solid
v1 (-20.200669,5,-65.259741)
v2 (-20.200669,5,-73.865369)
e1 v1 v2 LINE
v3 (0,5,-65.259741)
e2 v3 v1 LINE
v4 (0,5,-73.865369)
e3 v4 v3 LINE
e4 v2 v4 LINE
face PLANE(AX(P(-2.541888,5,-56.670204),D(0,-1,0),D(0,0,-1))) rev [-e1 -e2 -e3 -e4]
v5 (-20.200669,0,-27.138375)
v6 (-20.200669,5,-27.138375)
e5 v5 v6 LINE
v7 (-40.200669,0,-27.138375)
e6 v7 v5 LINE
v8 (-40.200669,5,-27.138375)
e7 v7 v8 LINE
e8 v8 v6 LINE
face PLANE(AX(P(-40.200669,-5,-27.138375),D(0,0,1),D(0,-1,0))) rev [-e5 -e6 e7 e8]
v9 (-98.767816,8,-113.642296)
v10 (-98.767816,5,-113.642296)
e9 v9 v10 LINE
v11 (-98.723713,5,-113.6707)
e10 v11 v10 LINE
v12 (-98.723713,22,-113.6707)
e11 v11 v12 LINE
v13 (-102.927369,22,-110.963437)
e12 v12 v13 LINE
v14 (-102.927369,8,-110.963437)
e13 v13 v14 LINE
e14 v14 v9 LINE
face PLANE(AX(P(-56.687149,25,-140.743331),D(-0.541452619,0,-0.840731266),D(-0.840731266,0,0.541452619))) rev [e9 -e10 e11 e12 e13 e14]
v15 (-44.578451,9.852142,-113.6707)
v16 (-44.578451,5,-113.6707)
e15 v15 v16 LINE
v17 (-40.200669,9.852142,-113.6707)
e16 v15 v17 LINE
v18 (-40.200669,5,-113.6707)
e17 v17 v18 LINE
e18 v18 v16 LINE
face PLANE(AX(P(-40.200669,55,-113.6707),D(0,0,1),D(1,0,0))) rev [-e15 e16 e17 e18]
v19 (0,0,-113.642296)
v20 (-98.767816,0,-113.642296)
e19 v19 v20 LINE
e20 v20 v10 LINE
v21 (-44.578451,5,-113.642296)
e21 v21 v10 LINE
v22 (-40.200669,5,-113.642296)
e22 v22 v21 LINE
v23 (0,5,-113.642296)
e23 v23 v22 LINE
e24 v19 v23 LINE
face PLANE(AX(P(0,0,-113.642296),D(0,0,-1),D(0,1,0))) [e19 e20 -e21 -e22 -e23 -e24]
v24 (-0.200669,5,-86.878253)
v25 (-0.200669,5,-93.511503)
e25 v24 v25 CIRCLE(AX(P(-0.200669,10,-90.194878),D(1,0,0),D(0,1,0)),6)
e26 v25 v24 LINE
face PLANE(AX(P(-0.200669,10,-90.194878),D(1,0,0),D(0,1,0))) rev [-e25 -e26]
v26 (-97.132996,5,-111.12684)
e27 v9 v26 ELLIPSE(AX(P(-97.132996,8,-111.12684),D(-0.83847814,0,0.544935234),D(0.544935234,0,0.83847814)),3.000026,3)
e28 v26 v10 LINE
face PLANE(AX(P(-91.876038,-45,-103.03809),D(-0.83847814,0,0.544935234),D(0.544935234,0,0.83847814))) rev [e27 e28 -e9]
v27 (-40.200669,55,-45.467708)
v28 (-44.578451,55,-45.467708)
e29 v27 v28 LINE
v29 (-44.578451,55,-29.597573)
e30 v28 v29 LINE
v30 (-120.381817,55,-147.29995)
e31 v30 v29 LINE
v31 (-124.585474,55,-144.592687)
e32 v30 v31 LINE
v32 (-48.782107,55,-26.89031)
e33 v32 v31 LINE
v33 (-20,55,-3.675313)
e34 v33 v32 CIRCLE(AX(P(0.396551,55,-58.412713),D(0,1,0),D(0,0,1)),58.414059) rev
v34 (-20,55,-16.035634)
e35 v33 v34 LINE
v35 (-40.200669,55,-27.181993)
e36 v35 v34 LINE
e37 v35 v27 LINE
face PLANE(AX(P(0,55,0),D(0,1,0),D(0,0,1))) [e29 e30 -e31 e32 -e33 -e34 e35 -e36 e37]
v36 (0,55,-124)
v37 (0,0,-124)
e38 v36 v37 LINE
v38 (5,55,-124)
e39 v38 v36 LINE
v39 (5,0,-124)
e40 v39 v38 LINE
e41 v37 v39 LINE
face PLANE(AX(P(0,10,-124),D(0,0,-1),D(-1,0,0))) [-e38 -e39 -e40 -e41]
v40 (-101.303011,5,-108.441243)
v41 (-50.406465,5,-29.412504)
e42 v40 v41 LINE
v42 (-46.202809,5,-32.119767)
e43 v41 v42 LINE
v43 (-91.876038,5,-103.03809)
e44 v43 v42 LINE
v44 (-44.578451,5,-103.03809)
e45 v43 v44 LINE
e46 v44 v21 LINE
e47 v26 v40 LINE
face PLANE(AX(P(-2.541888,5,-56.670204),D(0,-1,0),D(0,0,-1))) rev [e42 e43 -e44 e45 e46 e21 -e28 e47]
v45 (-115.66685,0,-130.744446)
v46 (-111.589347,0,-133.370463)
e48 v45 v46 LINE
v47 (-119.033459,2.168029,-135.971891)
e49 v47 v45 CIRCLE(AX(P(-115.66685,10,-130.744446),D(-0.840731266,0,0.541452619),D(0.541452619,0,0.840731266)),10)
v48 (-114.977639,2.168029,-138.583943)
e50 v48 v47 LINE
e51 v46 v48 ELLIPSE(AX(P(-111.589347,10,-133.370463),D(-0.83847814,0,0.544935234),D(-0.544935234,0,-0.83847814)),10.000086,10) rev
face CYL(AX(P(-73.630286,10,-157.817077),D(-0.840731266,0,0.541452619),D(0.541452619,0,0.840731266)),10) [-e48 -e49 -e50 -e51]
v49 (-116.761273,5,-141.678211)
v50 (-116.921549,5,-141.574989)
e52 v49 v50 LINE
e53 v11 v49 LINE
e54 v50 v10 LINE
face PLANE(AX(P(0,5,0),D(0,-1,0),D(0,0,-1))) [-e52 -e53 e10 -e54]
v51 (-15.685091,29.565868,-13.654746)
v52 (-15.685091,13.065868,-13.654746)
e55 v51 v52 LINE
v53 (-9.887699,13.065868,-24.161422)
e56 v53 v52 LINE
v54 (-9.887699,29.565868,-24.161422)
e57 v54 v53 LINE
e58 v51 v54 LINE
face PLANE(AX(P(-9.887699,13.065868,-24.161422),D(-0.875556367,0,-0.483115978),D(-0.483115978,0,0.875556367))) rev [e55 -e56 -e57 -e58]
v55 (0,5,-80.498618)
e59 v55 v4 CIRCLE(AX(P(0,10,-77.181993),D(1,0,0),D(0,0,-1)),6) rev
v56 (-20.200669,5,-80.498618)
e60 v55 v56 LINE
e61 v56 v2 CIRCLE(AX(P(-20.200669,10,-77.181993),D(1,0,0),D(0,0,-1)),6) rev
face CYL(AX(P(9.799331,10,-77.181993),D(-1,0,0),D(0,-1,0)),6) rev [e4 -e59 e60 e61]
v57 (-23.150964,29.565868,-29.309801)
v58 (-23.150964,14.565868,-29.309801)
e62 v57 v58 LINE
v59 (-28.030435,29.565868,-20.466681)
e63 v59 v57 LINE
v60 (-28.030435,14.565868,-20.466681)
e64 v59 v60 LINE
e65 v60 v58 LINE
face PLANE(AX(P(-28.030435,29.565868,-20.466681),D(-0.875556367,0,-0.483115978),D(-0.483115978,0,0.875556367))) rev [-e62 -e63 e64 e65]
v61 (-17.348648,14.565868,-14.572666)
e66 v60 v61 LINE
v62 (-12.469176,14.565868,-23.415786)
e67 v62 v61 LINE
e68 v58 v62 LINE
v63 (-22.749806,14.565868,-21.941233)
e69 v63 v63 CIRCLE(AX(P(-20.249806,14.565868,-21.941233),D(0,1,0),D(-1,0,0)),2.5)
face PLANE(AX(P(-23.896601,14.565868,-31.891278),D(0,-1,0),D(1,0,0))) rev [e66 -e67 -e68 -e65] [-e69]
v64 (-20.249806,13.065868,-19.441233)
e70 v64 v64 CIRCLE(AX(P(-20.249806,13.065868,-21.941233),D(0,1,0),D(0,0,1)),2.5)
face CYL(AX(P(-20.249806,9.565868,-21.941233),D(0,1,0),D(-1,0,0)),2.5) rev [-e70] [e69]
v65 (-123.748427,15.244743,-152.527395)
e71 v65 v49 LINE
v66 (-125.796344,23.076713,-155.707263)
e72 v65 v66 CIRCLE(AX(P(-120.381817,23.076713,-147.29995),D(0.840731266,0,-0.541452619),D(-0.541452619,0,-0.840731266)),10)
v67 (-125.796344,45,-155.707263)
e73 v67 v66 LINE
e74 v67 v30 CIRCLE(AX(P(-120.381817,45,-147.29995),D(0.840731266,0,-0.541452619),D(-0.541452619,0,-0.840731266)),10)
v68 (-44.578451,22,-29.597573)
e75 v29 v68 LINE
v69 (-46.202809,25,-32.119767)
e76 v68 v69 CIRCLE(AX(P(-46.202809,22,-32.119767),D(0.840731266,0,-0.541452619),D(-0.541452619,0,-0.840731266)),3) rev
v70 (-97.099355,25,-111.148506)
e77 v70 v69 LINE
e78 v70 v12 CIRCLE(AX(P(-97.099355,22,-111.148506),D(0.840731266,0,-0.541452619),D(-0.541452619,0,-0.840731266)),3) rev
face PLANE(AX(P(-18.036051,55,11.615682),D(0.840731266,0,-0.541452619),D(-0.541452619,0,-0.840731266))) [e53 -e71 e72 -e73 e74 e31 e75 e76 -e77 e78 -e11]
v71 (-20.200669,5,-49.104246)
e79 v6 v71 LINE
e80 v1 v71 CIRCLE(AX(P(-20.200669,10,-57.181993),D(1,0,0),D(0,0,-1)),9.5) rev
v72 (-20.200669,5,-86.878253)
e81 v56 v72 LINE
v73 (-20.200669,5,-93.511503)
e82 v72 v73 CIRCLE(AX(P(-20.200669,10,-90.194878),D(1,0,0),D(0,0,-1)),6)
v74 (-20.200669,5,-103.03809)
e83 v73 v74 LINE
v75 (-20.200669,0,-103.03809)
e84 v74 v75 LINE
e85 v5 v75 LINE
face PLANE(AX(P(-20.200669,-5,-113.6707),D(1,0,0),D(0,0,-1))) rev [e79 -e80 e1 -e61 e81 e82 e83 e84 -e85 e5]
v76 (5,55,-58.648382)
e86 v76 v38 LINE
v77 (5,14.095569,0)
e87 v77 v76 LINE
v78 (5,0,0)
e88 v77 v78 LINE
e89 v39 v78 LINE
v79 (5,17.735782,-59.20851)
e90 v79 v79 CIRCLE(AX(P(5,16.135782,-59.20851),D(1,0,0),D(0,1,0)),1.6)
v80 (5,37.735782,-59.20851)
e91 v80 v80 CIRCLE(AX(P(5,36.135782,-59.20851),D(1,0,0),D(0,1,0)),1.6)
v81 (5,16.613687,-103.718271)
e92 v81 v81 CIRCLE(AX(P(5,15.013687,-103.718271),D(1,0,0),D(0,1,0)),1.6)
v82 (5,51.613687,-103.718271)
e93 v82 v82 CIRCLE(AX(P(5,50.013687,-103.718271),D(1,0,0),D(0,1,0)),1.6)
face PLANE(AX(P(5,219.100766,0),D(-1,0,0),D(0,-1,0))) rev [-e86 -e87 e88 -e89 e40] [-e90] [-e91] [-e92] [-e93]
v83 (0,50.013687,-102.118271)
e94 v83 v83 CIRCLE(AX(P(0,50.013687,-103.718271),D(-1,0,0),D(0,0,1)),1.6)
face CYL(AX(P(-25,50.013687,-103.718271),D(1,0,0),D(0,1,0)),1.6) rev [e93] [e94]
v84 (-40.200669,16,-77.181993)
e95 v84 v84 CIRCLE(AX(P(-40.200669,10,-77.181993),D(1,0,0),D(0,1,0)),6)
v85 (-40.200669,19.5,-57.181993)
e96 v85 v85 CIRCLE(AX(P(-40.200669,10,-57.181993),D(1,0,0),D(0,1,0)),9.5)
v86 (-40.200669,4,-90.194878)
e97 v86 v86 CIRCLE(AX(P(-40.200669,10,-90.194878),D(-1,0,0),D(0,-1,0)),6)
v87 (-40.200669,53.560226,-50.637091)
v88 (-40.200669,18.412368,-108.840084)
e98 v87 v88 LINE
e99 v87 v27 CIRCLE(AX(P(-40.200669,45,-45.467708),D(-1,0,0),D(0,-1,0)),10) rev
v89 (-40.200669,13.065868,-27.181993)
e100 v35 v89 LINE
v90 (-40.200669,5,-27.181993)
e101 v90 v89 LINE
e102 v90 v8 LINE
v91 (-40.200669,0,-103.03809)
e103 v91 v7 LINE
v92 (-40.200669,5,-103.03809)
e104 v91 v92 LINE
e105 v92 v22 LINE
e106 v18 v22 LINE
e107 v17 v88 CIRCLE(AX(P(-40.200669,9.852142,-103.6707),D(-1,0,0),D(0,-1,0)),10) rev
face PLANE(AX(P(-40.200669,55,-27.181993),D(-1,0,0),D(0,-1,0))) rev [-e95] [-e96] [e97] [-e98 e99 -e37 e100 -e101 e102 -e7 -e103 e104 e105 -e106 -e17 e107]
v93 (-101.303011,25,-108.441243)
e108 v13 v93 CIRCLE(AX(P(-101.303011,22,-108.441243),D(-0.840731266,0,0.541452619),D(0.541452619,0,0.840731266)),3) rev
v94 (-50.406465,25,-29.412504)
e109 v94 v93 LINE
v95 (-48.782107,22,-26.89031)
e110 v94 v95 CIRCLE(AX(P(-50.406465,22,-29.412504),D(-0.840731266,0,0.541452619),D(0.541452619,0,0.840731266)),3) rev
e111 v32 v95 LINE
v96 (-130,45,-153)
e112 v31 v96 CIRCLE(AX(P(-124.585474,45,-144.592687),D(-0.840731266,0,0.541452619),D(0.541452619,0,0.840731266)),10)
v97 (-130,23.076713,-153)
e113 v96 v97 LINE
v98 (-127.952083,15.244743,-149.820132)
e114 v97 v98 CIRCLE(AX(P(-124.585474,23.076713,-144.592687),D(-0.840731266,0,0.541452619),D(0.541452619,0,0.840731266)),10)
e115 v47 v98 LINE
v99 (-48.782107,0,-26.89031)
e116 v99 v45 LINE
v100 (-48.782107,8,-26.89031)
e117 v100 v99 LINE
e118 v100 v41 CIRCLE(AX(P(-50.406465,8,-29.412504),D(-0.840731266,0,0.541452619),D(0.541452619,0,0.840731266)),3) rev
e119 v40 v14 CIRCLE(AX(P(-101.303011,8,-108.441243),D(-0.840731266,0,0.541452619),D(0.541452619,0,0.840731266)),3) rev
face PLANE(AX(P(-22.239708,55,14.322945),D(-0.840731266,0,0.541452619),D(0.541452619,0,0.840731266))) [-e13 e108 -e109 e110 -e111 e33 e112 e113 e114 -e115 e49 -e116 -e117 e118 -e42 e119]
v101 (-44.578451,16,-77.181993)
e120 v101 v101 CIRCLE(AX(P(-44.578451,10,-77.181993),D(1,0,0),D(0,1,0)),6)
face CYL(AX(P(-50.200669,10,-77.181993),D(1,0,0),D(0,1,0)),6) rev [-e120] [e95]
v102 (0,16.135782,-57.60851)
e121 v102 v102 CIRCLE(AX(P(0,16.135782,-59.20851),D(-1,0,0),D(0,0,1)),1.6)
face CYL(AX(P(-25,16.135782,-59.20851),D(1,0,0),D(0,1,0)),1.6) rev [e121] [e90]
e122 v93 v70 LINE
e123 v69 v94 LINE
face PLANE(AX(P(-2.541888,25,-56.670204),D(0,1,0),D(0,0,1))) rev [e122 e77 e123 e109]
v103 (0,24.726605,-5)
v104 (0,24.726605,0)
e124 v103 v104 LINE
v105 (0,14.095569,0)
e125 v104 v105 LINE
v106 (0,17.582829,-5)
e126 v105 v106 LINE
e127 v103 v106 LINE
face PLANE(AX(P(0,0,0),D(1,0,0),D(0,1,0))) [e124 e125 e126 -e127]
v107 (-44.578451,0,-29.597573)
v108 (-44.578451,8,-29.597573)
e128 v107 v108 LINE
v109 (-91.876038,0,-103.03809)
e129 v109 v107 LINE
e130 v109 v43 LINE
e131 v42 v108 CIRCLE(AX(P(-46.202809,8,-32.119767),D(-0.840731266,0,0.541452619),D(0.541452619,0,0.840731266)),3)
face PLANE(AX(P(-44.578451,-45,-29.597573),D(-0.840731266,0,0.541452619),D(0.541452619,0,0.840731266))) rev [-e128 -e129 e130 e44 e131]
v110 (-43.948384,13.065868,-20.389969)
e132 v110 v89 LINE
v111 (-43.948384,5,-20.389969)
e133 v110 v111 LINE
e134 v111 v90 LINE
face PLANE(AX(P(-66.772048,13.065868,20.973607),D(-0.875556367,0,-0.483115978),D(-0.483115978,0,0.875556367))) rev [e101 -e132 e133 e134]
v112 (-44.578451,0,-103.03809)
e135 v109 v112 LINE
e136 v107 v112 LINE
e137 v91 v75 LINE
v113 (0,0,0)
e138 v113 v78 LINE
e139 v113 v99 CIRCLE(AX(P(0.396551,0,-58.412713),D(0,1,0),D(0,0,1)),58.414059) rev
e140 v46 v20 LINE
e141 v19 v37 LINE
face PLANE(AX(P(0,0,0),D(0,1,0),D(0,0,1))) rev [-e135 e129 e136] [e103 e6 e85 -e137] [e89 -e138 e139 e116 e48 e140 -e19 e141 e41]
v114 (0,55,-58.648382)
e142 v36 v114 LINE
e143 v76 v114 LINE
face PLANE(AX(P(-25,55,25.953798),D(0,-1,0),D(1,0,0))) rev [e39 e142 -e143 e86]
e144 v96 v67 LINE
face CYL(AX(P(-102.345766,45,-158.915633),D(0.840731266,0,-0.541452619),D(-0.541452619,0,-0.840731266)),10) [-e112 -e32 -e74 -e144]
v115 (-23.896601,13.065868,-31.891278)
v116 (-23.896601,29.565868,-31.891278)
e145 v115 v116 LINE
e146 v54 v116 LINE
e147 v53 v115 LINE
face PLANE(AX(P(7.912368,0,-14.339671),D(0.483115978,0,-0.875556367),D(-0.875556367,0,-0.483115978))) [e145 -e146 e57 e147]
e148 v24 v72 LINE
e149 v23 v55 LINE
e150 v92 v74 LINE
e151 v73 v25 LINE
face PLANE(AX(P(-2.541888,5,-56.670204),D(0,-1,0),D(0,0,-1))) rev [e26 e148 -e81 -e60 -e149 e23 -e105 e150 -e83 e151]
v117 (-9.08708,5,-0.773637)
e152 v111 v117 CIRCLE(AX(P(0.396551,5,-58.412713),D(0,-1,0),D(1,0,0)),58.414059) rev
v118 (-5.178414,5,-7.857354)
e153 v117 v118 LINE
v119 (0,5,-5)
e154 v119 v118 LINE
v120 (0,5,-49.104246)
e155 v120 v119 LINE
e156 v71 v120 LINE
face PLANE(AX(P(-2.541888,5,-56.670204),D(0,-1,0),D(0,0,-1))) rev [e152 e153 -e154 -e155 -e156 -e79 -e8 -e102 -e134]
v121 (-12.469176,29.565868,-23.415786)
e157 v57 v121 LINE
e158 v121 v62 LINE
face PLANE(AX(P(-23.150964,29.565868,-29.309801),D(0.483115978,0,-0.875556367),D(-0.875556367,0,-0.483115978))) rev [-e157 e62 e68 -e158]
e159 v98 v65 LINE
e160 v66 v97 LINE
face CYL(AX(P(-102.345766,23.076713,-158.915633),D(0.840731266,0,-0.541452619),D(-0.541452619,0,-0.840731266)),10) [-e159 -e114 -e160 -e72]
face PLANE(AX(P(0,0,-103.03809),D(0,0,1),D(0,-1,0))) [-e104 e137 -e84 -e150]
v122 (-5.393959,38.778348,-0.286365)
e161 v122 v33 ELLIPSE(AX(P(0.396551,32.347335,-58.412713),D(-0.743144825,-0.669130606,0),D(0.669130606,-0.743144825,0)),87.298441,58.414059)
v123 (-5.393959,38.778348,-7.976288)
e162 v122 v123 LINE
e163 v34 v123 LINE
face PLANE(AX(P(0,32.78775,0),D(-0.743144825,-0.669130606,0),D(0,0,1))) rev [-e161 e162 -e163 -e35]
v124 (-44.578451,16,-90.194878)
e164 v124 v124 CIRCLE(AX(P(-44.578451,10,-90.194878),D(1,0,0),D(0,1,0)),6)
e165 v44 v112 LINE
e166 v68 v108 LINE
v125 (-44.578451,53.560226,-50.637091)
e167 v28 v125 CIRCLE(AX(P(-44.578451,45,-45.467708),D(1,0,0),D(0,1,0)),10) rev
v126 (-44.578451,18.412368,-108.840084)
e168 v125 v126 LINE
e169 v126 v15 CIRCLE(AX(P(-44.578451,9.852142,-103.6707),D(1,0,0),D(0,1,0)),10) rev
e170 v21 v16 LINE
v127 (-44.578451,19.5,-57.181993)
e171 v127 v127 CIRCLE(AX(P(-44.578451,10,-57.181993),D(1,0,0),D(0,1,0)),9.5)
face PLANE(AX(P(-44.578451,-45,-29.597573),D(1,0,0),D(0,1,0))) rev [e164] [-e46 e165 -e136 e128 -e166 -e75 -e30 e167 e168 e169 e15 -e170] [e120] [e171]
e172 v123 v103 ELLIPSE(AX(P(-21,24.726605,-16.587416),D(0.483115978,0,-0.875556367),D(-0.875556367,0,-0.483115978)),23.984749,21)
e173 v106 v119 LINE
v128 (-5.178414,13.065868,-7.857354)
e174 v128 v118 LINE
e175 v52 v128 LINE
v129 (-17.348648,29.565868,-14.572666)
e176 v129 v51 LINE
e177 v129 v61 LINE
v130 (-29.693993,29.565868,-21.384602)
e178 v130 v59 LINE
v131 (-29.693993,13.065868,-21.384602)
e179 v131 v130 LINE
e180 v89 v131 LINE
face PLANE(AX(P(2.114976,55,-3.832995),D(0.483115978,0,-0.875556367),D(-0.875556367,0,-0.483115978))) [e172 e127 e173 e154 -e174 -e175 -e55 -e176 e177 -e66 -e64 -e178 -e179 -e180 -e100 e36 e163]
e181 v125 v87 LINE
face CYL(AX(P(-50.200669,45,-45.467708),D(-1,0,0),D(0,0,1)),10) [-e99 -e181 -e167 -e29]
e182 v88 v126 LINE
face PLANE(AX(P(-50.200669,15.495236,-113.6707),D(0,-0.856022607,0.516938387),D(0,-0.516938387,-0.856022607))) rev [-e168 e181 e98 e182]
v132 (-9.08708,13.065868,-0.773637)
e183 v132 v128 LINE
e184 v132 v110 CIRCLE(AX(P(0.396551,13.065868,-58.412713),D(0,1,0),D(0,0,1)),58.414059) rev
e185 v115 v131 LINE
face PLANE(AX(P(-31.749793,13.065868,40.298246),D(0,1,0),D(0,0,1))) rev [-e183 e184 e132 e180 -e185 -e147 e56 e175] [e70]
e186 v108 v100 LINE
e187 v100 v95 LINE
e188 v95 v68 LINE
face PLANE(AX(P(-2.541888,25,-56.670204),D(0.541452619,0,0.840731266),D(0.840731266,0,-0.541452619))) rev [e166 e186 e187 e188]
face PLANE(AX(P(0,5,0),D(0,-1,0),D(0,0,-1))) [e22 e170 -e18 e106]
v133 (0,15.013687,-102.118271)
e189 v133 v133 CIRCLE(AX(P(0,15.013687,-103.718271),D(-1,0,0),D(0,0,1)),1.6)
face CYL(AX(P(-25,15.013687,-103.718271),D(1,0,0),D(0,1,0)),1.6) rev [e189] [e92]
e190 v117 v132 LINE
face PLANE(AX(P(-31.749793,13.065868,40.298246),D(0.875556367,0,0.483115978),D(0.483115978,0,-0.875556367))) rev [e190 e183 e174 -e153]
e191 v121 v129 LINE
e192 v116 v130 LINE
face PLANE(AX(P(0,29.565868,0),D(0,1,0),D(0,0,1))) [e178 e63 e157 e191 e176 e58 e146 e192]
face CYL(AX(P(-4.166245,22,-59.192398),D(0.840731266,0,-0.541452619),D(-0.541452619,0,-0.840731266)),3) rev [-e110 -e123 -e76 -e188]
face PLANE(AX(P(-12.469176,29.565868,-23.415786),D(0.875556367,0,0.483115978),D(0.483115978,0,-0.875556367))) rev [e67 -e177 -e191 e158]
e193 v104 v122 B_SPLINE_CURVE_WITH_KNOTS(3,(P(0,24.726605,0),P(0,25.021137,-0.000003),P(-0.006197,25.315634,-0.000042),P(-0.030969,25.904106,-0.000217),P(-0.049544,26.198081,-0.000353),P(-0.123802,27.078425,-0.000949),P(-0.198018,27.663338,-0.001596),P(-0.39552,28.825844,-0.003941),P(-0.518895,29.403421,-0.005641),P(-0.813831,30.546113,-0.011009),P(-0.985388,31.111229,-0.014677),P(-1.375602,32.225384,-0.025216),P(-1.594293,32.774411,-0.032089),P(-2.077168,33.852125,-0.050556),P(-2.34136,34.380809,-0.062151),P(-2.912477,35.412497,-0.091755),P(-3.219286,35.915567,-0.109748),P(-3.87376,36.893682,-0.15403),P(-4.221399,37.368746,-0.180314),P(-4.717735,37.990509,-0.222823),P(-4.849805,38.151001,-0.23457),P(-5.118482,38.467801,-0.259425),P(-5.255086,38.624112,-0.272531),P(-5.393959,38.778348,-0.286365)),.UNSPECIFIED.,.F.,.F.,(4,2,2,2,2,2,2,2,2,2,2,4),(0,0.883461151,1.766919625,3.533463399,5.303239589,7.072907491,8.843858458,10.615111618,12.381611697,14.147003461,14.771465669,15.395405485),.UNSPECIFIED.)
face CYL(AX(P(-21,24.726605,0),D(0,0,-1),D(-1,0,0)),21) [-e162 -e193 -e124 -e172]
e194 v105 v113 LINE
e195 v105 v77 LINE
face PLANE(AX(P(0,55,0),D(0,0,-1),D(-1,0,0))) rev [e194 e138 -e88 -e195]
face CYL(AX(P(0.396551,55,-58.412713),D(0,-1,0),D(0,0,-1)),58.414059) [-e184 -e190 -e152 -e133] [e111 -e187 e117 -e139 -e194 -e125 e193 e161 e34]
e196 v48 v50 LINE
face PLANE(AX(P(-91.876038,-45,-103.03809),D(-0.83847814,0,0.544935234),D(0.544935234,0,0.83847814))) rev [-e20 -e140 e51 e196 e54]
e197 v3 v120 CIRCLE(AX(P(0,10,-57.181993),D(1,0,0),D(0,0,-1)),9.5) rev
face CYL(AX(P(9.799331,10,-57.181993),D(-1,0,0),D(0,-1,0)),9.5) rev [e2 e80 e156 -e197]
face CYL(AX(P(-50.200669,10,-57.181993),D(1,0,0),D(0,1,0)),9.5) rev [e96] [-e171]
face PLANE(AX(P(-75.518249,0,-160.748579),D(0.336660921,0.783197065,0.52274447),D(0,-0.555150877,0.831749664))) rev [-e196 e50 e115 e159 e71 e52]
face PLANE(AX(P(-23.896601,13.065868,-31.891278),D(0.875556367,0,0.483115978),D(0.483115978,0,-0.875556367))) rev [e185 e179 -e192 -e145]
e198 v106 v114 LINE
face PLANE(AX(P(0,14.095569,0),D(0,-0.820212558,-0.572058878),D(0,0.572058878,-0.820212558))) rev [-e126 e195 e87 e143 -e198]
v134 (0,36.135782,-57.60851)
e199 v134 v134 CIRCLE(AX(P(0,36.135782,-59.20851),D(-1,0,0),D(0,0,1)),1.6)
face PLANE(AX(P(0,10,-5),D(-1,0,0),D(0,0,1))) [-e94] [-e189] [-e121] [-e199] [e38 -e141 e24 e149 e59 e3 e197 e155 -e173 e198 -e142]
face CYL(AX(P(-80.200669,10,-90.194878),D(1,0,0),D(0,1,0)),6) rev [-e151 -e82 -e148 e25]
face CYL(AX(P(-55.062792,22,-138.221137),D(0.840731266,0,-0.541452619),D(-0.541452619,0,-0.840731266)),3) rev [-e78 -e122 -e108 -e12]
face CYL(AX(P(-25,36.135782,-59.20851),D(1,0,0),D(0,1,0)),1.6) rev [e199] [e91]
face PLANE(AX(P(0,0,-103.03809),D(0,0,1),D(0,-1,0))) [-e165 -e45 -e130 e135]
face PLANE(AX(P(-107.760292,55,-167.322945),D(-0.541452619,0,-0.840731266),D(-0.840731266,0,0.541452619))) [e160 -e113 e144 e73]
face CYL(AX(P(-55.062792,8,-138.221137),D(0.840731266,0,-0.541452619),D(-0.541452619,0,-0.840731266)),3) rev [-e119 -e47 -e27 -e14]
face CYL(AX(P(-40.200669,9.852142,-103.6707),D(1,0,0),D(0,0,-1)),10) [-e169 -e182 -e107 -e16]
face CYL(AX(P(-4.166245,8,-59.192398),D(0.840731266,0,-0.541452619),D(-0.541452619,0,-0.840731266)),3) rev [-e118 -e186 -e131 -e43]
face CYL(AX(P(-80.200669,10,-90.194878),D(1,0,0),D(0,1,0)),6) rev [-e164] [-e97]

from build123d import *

# Parameters (mm, degrees)
SKETCH1_W            = 155
SKETCH1_H            = 5
BOSS_EXTRUDE2_DEPTH  = 55
SKETCH2_W            = 112
SKETCH2_H            = 45
SKETCH2_R            = 1.75
CUT_EXTRUDE1_DEPTH   = 55
SKETCH3_W            = 100
SKETCH3_H            = 20
CUT_EXTRUDE2_DEPTH   = 55
SKETCH4_W            = 40
SKETCH4_H            = 8.065867699
CUT_EXTRUDE3_DEPTH   = 55
BOSS_EXTRUDE4_DEPTH  = 5
CUT_EXTRUDE4_DEPTH   = 50
SKETCH9_W            = 4.377781836
SKETCH9_H            = 86.488706471
BOSS_EXTRUDE7_DEPTH  = 50
SKETCH10_W           = 20
SKETCH10_H           = 86.532324722
CUT_EXTRUDE5_DEPTH   = 10
SKETCH12_R           = 9.5
SKETCH12_R_2         = 6
CUT_EXTRUDE6_DEPTH   = 10
CUT_EXTRUDE7_START   = 50
SKETCH13_R           = 9.5
SKETCH13_R_2         = 6
CUT_EXTRUDE7_DEPTH   = 50
CUT_EXTRUDE8_DEPTH   = 50
CUT_EXTRUDE9_DEPTH   = 50
CUT_EXTRUDE10_DEPTH  = 10
FILLET5_R            = 3
SKETCH18_W           = 98.767816147
SKETCH18_H           = 10.604205858
BOSS_EXTRUDE8_DEPTH  = 5
CUT_EXTRUDE11_DEPTH  = 5
SKETCH20_W           = 155
SKETCH20_H           = 119
BOSS_EXTRUDE9_DEPTH  = 10
CUT_EXTRUDE13_DEPTH  = 155
SKETCH24_W           = 125
SKETCH24_H           = 8
BOSS_EXTRUDE10_DEPTH = 95
FILLET6_R            = 20
SKETCH26_W           = 16
SKETCH26_H           = 1.5
BOSS_EXTRUDE11_DEPTH = 12
BOSS_EXTRUDE12_DEPTH = 15
SKETCH28_R           = 2.5
CUT_EXTRUDE15_DEPTH  = 5
CUT_EXTRUDE17_DEPTH  = 35
SKETCH29_W           = 43
SKETCH29_H           = 43
CUT_EXTRUDE18_DEPTH  = 35
FILLET9_R            = 10
SKETCH31_W           = 124
SKETCH31_H           = 12
BOSS_EXTRUDE14_DEPTH = 2
SKETCH32_W           = 5
SKETCH32_H           = 2
BOSS_EXTRUDE15_DEPTH = 132
SKETCH33_W           = 20
SKETCH33_H           = 12
CUT_EXTRUDE19_DEPTH  = 160
SKETCH34_W           = 2
SKETCH34_H           = 12
BOSS_EXTRUDE17_DEPTH = 123
SKETCH36_R           = 6
CUT_EXTRUDE20_DEPTH  = 40
CUT_EXTRUDE21_DEPTH  = 25
SKETCH39_W           = 10
SKETCH39_H           = 12
CUT_EXTRUDE22_DEPTH  = 165
SKETCH40_W           = 2
SKETCH40_H           = 12
BOSS_EXTRUDE18_DEPTH = 115
BOSS_EXTRUDE20_REACH = 223.912
SKETCH42_W           = 5
SKETCH42_H           = 124
SKETCH45_R           = 1.6
CUT_EXTRUDE23_DEPTH  = 30
BOSS_EXTRUDE22_DEPTH = 120
SKETCH52_W           = 2
SKETCH52_H           = 14.095569493
BOSS_EXTRUDE23_DEPTH = 120
CUT_EXTRUDE26_DEPTH  = 5
FILLET14_R           = 10
FILLET15_R           = 5
FILLET16_R           = 5
FILLET17_R           = 5
FILLET18_R           = 1
SKETCH55_W           = 143.69990308
SKETCH55_H           = 184.016268103
CUT_EXTRUDE27_DEPTH  = 224.986052647
CHAMFER2_SIZE        = 20
CHAMFER2_SIZE2       = 22.212250297
FILLET19_R           = 21
SKETCH58_W           = 176.64337682
SKETCH58_H           = 51.948423731
CUT_EXTRUDE30_DEPTH  = 30


with BuildPart() as part:
    # Sketch1 → Boss-Extrude2 (new body)
    with BuildSketch(Plane(origin=(0, 0, 0), x_dir=(1, 0, 0), z_dir=(0, 1, 0))):
        Polygon((-44.578450817, 29.59757322), (-48.782107146, 26.890310125), (-130, 153), (-125.796343671, 155.707263095), align=None)
        with BuildLine():
            ThreePointArc((0, 0), (-27.802696096, 7.256044178), (-48.782107146, 26.890310125))
            Line((-48.782107146, 26.890310125), (-44.578450817, 29.59757322))
            Line((-44.578450817, 29.59757322), (0, 5))
            Line((0, 5), (0, 0))
        make_face()
        with Locations((77.5, 2.5)):
            Rectangle(SKETCH1_W, SKETCH1_H)
    extrude(amount=BOSS_EXTRUDE2_DEPTH)

    # Sketch2 → Cut-Extrude1 (cut)
    with BuildSketch(Plane.XY):
        with Locations((99, 32.5)):
            Rectangle(SKETCH2_W, SKETCH2_H)
        with Locations((5, 25)):
            Circle(SKETCH2_R)
        with Locations((5, 50)):
            Circle(SKETCH2_R)
        with Locations((35, 50)):
            Circle(SKETCH2_R)
        with Locations((35, 25)):
            Circle(SKETCH2_R)
    extrude(amount=-CUT_EXTRUDE1_DEPTH, mode=Mode.SUBTRACT)

    # Sketch3 → Cut-Extrude2 (cut)
    with BuildSketch(Plane(origin=(-22.239707671, 0, 14.322945338), x_dir=(0.5414526190246729, 0, 0.840731265834287), z_dir=(-0.8407312658342869, 0, 0.5414526190246728))):
        with Locations((-99.020724146, 15)):
            Rectangle(SKETCH3_W, SKETCH3_H)
    extrude(amount=-CUT_EXTRUDE2_DEPTH, mode=Mode.SUBTRACT)

    # Sketch4 → Cut-Extrude3 (cut)
    with BuildSketch(Plane(origin=(2.114976352, 0, -3.832994761), x_dir=(-0.8755563671808256, 0, -0.48311597767939257), z_dir=(0.48311597767939257, 0, -0.8755563671808256))):
        with Locations((28.330006975, 9.03293385)):
            Rectangle(SKETCH4_W, SKETCH4_H)
    extrude(amount=-CUT_EXTRUDE3_DEPTH, mode=Mode.SUBTRACT)

    # Sketch5 → Boss-Extrude4 (add)
    with BuildSketch(Plane.XZ):
        Polygon((0, -5), (-44.578450817, -29.59757322), (-125.796343671, -155.707263095), (0, -155.707263095), align=None)
    extrude(amount=-BOSS_EXTRUDE4_DEPTH)

    # Sketch8 → Cut-Extrude4 (cut)
    with BuildSketch(Plane(origin=(0, 5, 0), x_dir=(1, 0, 0), z_dir=(0, 1, 0))):
        Polygon((-44.578450817, 29.59757322), (-98.72371272, 113.670699803), (-44.578450817, 113.670699803), align=None)
    extrude(amount=-CUT_EXTRUDE4_DEPTH, mode=Mode.SUBTRACT)

    # Sketch9 → Boss-Extrude7 (add)
    with BuildSketch(Plane(origin=(0, 5, 0), x_dir=(1, 0, 0), z_dir=(0, 1, 0))):
        with Locations((-42.389559899, 70.426346568)):
            Rectangle(SKETCH9_W, SKETCH9_H)
    extrude(amount=BOSS_EXTRUDE7_DEPTH)

    # Sketch10 → Cut-Extrude5 (cut)
    with BuildSketch(Plane(origin=(0, 5, 0), x_dir=(1, 0, 0), z_dir=(0, 1, 0))):
        with Locations((-30.200668981, 70.404537442)):
            Rectangle(SKETCH10_W, SKETCH10_H)
    extrude(amount=-CUT_EXTRUDE5_DEPTH, mode=Mode.SUBTRACT)

    # Sketch12 → Cut-Extrude6 (cut)
    with BuildSketch(Plane(origin=(-40.200668981, 0, 0), x_dir=(0, 0, -1), z_dir=(1, 0, 0))):
        with Locations(Location((57.181993332, 10, 0), (0, 0, 90))):
            Circle(SKETCH12_R)
        with Locations(Location((77.181993332, 10, 0), (0, 0, 90))):
            Circle(SKETCH12_R_2)
    extrude(amount=-CUT_EXTRUDE6_DEPTH, mode=Mode.SUBTRACT)

    # Sketch13 → Cut-Extrude7 (cut)
    with BuildSketch(Plane(origin=(-40.200668981, 0, 0), x_dir=(0, 0, -1), z_dir=(1, 0, 0)).offset(CUT_EXTRUDE7_START)):
        with Locations(Location((57.181993332, 10, 0), (0, 0, 90))):
            Circle(SKETCH13_R)
        with Locations(Location((77.181993332, 10, 0), (0, 0, 90))):
            Circle(SKETCH13_R_2)
    extrude(amount=-CUT_EXTRUDE7_DEPTH, mode=Mode.SUBTRACT)

    # Sketch14 → Cut-Extrude8 (cut)
    with BuildSketch(Plane(origin=(0, 5, 0), x_dir=(1, 0, 0), z_dir=(0, 1, 0))):
        Polygon((0, 103.038090201), (-91.876037903, 103.038090201), (-126.106254173, 155.707263095), (0, 155.707263095), align=None)
    extrude(amount=-CUT_EXTRUDE8_DEPTH, mode=Mode.SUBTRACT)

    # Sketch15 → Cut-Extrude9 (cut)
    with BuildSketch(Plane(origin=(-22.239707671, 0, 14.322945338), x_dir=(0.5414526190246729, 0, 0.840731265834287), z_dir=(-0.8407312658342869, 0, 0.5414526190246728))):
        Polygon((-176.035909688, 0), (-199.020724146, 18.247450711), (-199.020724146, 0), align=None)
    extrude(amount=-CUT_EXTRUDE9_DEPTH, mode=Mode.SUBTRACT)

    # Sketch16 → Cut-Extrude10 (cut)
    with BuildSketch(Plane(origin=(-40.200668981, 0, 0), x_dir=(0, 0, -1), z_dir=(1, 0, 0))):
        Polygon((113.670699803, 15.495236251), (48.252901996, 55), (113.670699803, 55), align=None)
    extrude(amount=-CUT_EXTRUDE10_DEPTH, mode=Mode.SUBTRACT)

    # Fillet5
    fillet5_edges = [part.edges().sort_by_distance(p)[0] for p in [
        (-100.847592598, 5, -112.302866383),
        (-46.680278982, 25, -28.243941672),
        (-46.680278982, 5, -28.243941672),
        (-100.825540884, 25, -112.317068256),
    ]]
    fillet(fillet5_edges, radius=FILLET5_R)

    # Sketch18 → Boss-Extrude8 (add)
    with BuildSketch(Plane(origin=(0, 5, 0), x_dir=(1, 0, 0), z_dir=(0, 1, 0))):
        with Locations((-49.383908074, 108.34019313)):
            Rectangle(SKETCH18_W, SKETCH18_H)
    extrude(amount=-BOSS_EXTRUDE8_DEPTH)

    # Sketch19 → Cut-Extrude11 (cut)
    with BuildSketch(Plane.XZ):
        Polygon((-97.82324149, -103.038090201), (-98.767816147, -104.504762295), (-98.767816147, -103.038090201), align=None)
    extrude(amount=-CUT_EXTRUDE11_DEPTH, mode=Mode.SUBTRACT)

    # Sketch20 → Boss-Extrude9 (add)
    with BuildSketch(Plane.XZ):
        with Locations((77.5, -64.5)):
            Rectangle(SKETCH20_W, SKETCH20_H)
    extrude(amount=-BOSS_EXTRUDE9_DEPTH)

    # Sketch21 → Cut-Extrude13 (cut)
    with BuildSketch(Plane(origin=(155, 0, 0), x_dir=(0, 0, -1), z_dir=(1, 0, 0))):
        Polygon((5, 10), (124, 10), (124, 7), align=None)
    extrude(amount=-CUT_EXTRUDE13_DEPTH, mode=Mode.SUBTRACT)

    # Sketch24 → Boss-Extrude10 (add)
    with BuildSketch(Plane.XZ):
        with Locations((62.5, -120)):
            Rectangle(SKETCH24_W, SKETCH24_H)
    extrude(amount=-BOSS_EXTRUDE10_DEPTH)

    # Fillet6
    fillet6_edges = [part.edges().sort_by_distance(p)[0] for p in [
        (62.5, 7.201680672, -116),
    ]]
    fillet(fillet6_edges, radius=FILLET6_R)

    # Sketch26 → Boss-Extrude11 (add)
    with BuildSketch(Plane(origin=(2.114976352, 0, -3.832994761), x_dir=(-0.8755563671808256, 0, -0.48311597767939257), z_dir=(0.48311597767939257, 0, -0.8755563671808256))):
        with Locations((28.330006975, 13.815867699)):
            Rectangle(SKETCH26_W, SKETCH26_H)
    extrude(amount=BOSS_EXTRUDE11_DEPTH)

    # Sketch27 → Boss-Extrude12 (add)
    with BuildSketch(Plane(origin=(0, 14.565867699, 0), x_dir=(1, 0, 0), z_dir=(0, 1, 0))):
        Polygon((-15.6850907, 13.654745957), (-9.887698968, 24.161422363), (-23.896600843, 31.891278006), (-29.693992575, 21.384601599), (-28.030435477, 20.466681242), (-23.150964103, 29.30980055), (-12.469176423, 23.415785623), (-17.348647798, 14.572666314), align=None)
    extrude(amount=BOSS_EXTRUDE12_DEPTH)

    # Sketch28 → Cut-Extrude15 (cut)
    with BuildSketch(Plane(origin=(0, 14.565867699, 0), x_dir=(1, 0, 0), z_dir=(0, 1, 0))):
        with Locations(Location((-20.24980595, 21.941233432, 0), (0, 0, 180))):
            Circle(SKETCH28_R)
    extrude(amount=-CUT_EXTRUDE15_DEPTH, mode=Mode.SUBTRACT)

    # Sketch25 → Cut-Extrude17 (cut)
    with BuildSketch(Plane(origin=(0, 0, -124), x_dir=(-1, 0, 0), z_dir=(0, 0, -1))):
        with BuildLine():
            Line((-36.75, 77), (-36.75, 72))
            ThreePointArc((-36.75, 72), (-35, 70.25), (-33.25, 72))
            Line((-33.25, 72), (-33.25, 77))
            ThreePointArc((-33.25, 77), (-35, 78.75), (-36.75, 77))
        make_face()
        with BuildLine():
            Line((-73.25, 77), (-73.25, 72))
            ThreePointArc((-73.25, 72), (-75, 70.25), (-76.75, 72))
            Line((-76.75, 72), (-76.75, 77))
            ThreePointArc((-76.75, 77), (-75, 78.75), (-73.25, 77))
        make_face()
    extrude(amount=-CUT_EXTRUDE17_DEPTH, mode=Mode.SUBTRACT)

    # Sketch29 → Cut-Extrude18 (cut)
    with BuildSketch(Plane.XY):
        with Locations((21.5, 33.5)):
            Rectangle(SKETCH29_W, SKETCH29_H)
    extrude(amount=-CUT_EXTRUDE18_DEPTH, mode=Mode.SUBTRACT)

    # Fillet9
    fillet9_edges = [part.edges().sort_by_distance(p)[0] for p in [
        (-115.522140631, 0, -134.985040643),
        (-127.898171835, 18.247450711, -154.353631548),
        (-42.389559899, 15.495236251, -113.670699803),
        (-42.389559899, 55, -48.252901996),
        (-127.898171835, 55, -154.353631548),
    ]]
    fillet(fillet9_edges, radius=FILLET9_R)

    # Sketch31 → Boss-Extrude14 (add)
    with BuildSketch(Plane(origin=(155, 0, 0), x_dir=(0, 0, -1), z_dir=(1, 0, 0))):
        with Locations((62, 6)):
            Rectangle(SKETCH31_W, SKETCH31_H)
    extrude(amount=-BOSS_EXTRUDE14_DEPTH)

    # Sketch32 → Boss-Extrude15 (add)
    with BuildSketch(Plane.ZY.offset(-153)):
        with Locations((-2.5, 11)):
            Rectangle(SKETCH32_W, SKETCH32_H)
    extrude(amount=BOSS_EXTRUDE15_DEPTH)

    # Sketch33 → Cut-Extrude19 (cut)
    with BuildSketch(Plane.XY):
        with Locations((145, 6)):
            Rectangle(SKETCH33_W, SKETCH33_H)
    extrude(amount=-CUT_EXTRUDE19_DEPTH, mode=Mode.SUBTRACT)

    # Sketch34 → Boss-Extrude17 (add)
    with BuildSketch(Plane.XY):
        with Locations((134, 6)):
            Rectangle(SKETCH34_W, SKETCH34_H)
    extrude(amount=-BOSS_EXTRUDE17_DEPTH)

    # Sketch36 → Cut-Extrude20 (cut, symmetric)
    with BuildSketch(Plane(origin=(-40.200668981, 0, 0), x_dir=(0, 0, -1), z_dir=(1, 0, 0))):
        with Locations(Location((90.194878088, 10, 0), (0, 0, 90))):
            Circle(SKETCH36_R)
    extrude(amount=CUT_EXTRUDE20_DEPTH, both=True, mode=Mode.SUBTRACT)

    # Sketch38 → Cut-Extrude21 (cut)
    with BuildSketch(Plane(origin=(125, 0, 0), x_dir=(0, 0, -1), z_dir=(1, 0, 0))):
        Polygon((95.495958465, 7.718589282), (124, 7), (124, 95), (116, 95), align=None)
    extrude(amount=-CUT_EXTRUDE21_DEPTH, mode=Mode.SUBTRACT)

    # Sketch39 → Cut-Extrude22 (cut)
    with BuildSketch(Plane.XY):
        with Locations((130, 6)):
            Rectangle(SKETCH39_W, SKETCH39_H)
    extrude(amount=-CUT_EXTRUDE22_DEPTH, mode=Mode.SUBTRACT)

    # Sketch40 → Boss-Extrude18 (add)
    with BuildSketch(Plane.XY):
        with Locations((124, 6)):
            Rectangle(SKETCH40_W, SKETCH40_H)
    extrude(amount=-BOSS_EXTRUDE18_DEPTH)

    # Boss-Extrude20: up to this face of the body (flat: up to its plane)
    boss_extrude20_end = Plane(part.part.faces().sort_by_distance((50, 95, -120))[0])
    # Sketch42 → Boss-Extrude20 (add, up to the picked face)
    with BuildSketch(Plane(origin=(0, 5, 0), x_dir=(1, 0, 0), z_dir=(0, 1, 0)), mode=Mode.PRIVATE) as boss_extrude20_sk1:
        with Locations((2.5, 62)):
            Rectangle(SKETCH42_W, SKETCH42_H)
    boss_extrude20_tool1 = split(extrude(boss_extrude20_sk1.sketch, amount=BOSS_EXTRUDE20_REACH, mode=Mode.PRIVATE), bisect_by=boss_extrude20_end, keep=Keep.BOTH, mode=Mode.PRIVATE)
    add(boss_extrude20_tool1.solids().sort_by(Axis((2.5, 5, -62), (0, 1, 0)))[0])

    # Sketch45 → Cut-Extrude23 (cut)
    with BuildSketch(Plane(origin=(5, 0, 0), x_dir=(0, 0, -1), z_dir=(1, 0, 0))):
        with Locations(Location((59.208509529, 36.135781847, 0), (0, 0, 90))):
            Circle(SKETCH45_R)
        with Locations(Location((59.208509529, 16.135781847, 0), (0, 0, 90))):
            Circle(SKETCH45_R)
        with Locations(Location((103.718271361, 50.013687011, 0), (0, 0, 90))):
            Circle(SKETCH45_R)
        with Locations(Location((103.718271361, 15.013687011, 0), (0, 0, 90))):
            Circle(SKETCH45_R)
    extrude(amount=-CUT_EXTRUDE23_DEPTH, mode=Mode.SUBTRACT)

    # Sketch51 → Boss-Extrude22 (add)
    with BuildSketch(Plane(origin=(125, 0, 0), x_dir=(0, 0, -1), z_dir=(1, 0, 0))):
        Polygon((124, 7), (5, 12), (5, 14.095569493), (0, 14.095569493), (0, 7.113445378), align=None)
    extrude(amount=-BOSS_EXTRUDE22_DEPTH)

    # Sketch52 → Boss-Extrude23 (add)
    with BuildSketch(Plane.XY):
        with Locations((124, 7.047784747)):
            Rectangle(SKETCH52_W, SKETCH52_H)
    extrude(amount=-BOSS_EXTRUDE23_DEPTH)

    # Sketch54 → Cut-Extrude26 (cut)
    with BuildSketch(Plane(origin=(5, 0, 0), x_dir=(0, 0, -1), z_dir=(1, 0, 0))):
        Polygon((0, 14.095569493), (116, 95), (0, 95), align=None)
    extrude(amount=-CUT_EXTRUDE26_DEPTH, mode=Mode.SUBTRACT)

    # Fillet14
    fillet14_edges = [part.edges().sort_by_distance(p)[0] for p in [
        (100, 7.513892889, -111.769349239),
    ]]
    fillet(fillet14_edges, radius=FILLET14_R)

    # Fillet15
    fillet15_edges = [part.edges().sort_by_distance(p)[0] for p in [
        (124, 14.095569493, -120),
    ]]
    fillet(fillet15_edges, radius=FILLET15_R)

    # Fillet16
    # the kernel refuses this fillet: 5 mm, written as the material it adds along each edge
    with BuildSketch(Plane(origin=(123, 7.168067227, -120), x_dir=(0, 0.9980473315851939, 0.062462179882501946), z_dir=(1, 0, 0))) as fillet16_piece_1:
        with BuildLine():
            CenterArc((4.502899102, -4.869840665), FILLET16_R, 103.101980319, 66.66628485)
            Line((-0.417587767, -3.981691481), (-0.909636454, -3.892876563))
            ThreePointArc((-0.909636454, -3.892876563), (-0.706066567, -1.938693285), (-0.497272683, 0.052152456))
            Line((-0.497272683, 0.052152456), (0.03123109, 0.499023666))
            ThreePointArc((0.03123109, 0.499023666), (1.954969583, 0.378627673), (3.256131762, 0.486984066))
            Line((3.256131762, 0.486984066), (3.369474248, 0))
        make_face()
    extrude(amount=2)

    # Fillet17
    fillet17_edges = [part.edges().sort_by_distance(p)[0] for p in [
        (100, 95, -120),
    ]]
    fillet(fillet17_edges, radius=FILLET17_R)

    # Fillet18
    fillet18_edges = [part.edges().sort_by_distance(p)[0] for p in [
        (5, 10.013892889, -52.269349239),
    ]]
    fillet(fillet18_edges, radius=FILLET18_R)

    # Sketch55 → Cut-Extrude27 (cut, through all)
    with BuildSketch(Plane.XY):
        with Locations((76.84995154, 92.008134052)):
            Rectangle(SKETCH55_W, SKETCH55_H)
    extrude(amount=-CUT_EXTRUDE27_DEPTH, mode=Mode.SUBTRACT)

    # Chamfer2
    chamfer2_edges = [part.edges().sort_by_distance(p)[0] for p in [
        (0, 55, -2.5),
    ]]
    chamfer2_side = [part.faces().sort_by_distance(p)[0] for p in [
        (-42.129886846, 55, -36.324850438),
    ]]
    chamfer(chamfer2_edges, length=CHAMFER2_SIZE, length2=CHAMFER2_SIZE2, reference=chamfer2_side[0])

    # Fillet19
    fillet19_edges = [part.edges().sort_by_distance(p)[0] for p in [
        (0, 32.787749703, -2.5),
    ]]
    fillet(fillet19_edges, radius=FILLET19_R)

    # Sketch58 → Cut-Extrude30 (cut)
    with BuildSketch(Plane(origin=(5, 0, 0), x_dir=(0, 0, -1), z_dir=(1, 0, 0))):
        with Locations((62.367890206, 80.974211865)):
            Rectangle(SKETCH58_W, SKETCH58_H)
    extrude(amount=-CUT_EXTRUDE30_DEPTH, mode=Mode.SUBTRACT)


solid = part.part
